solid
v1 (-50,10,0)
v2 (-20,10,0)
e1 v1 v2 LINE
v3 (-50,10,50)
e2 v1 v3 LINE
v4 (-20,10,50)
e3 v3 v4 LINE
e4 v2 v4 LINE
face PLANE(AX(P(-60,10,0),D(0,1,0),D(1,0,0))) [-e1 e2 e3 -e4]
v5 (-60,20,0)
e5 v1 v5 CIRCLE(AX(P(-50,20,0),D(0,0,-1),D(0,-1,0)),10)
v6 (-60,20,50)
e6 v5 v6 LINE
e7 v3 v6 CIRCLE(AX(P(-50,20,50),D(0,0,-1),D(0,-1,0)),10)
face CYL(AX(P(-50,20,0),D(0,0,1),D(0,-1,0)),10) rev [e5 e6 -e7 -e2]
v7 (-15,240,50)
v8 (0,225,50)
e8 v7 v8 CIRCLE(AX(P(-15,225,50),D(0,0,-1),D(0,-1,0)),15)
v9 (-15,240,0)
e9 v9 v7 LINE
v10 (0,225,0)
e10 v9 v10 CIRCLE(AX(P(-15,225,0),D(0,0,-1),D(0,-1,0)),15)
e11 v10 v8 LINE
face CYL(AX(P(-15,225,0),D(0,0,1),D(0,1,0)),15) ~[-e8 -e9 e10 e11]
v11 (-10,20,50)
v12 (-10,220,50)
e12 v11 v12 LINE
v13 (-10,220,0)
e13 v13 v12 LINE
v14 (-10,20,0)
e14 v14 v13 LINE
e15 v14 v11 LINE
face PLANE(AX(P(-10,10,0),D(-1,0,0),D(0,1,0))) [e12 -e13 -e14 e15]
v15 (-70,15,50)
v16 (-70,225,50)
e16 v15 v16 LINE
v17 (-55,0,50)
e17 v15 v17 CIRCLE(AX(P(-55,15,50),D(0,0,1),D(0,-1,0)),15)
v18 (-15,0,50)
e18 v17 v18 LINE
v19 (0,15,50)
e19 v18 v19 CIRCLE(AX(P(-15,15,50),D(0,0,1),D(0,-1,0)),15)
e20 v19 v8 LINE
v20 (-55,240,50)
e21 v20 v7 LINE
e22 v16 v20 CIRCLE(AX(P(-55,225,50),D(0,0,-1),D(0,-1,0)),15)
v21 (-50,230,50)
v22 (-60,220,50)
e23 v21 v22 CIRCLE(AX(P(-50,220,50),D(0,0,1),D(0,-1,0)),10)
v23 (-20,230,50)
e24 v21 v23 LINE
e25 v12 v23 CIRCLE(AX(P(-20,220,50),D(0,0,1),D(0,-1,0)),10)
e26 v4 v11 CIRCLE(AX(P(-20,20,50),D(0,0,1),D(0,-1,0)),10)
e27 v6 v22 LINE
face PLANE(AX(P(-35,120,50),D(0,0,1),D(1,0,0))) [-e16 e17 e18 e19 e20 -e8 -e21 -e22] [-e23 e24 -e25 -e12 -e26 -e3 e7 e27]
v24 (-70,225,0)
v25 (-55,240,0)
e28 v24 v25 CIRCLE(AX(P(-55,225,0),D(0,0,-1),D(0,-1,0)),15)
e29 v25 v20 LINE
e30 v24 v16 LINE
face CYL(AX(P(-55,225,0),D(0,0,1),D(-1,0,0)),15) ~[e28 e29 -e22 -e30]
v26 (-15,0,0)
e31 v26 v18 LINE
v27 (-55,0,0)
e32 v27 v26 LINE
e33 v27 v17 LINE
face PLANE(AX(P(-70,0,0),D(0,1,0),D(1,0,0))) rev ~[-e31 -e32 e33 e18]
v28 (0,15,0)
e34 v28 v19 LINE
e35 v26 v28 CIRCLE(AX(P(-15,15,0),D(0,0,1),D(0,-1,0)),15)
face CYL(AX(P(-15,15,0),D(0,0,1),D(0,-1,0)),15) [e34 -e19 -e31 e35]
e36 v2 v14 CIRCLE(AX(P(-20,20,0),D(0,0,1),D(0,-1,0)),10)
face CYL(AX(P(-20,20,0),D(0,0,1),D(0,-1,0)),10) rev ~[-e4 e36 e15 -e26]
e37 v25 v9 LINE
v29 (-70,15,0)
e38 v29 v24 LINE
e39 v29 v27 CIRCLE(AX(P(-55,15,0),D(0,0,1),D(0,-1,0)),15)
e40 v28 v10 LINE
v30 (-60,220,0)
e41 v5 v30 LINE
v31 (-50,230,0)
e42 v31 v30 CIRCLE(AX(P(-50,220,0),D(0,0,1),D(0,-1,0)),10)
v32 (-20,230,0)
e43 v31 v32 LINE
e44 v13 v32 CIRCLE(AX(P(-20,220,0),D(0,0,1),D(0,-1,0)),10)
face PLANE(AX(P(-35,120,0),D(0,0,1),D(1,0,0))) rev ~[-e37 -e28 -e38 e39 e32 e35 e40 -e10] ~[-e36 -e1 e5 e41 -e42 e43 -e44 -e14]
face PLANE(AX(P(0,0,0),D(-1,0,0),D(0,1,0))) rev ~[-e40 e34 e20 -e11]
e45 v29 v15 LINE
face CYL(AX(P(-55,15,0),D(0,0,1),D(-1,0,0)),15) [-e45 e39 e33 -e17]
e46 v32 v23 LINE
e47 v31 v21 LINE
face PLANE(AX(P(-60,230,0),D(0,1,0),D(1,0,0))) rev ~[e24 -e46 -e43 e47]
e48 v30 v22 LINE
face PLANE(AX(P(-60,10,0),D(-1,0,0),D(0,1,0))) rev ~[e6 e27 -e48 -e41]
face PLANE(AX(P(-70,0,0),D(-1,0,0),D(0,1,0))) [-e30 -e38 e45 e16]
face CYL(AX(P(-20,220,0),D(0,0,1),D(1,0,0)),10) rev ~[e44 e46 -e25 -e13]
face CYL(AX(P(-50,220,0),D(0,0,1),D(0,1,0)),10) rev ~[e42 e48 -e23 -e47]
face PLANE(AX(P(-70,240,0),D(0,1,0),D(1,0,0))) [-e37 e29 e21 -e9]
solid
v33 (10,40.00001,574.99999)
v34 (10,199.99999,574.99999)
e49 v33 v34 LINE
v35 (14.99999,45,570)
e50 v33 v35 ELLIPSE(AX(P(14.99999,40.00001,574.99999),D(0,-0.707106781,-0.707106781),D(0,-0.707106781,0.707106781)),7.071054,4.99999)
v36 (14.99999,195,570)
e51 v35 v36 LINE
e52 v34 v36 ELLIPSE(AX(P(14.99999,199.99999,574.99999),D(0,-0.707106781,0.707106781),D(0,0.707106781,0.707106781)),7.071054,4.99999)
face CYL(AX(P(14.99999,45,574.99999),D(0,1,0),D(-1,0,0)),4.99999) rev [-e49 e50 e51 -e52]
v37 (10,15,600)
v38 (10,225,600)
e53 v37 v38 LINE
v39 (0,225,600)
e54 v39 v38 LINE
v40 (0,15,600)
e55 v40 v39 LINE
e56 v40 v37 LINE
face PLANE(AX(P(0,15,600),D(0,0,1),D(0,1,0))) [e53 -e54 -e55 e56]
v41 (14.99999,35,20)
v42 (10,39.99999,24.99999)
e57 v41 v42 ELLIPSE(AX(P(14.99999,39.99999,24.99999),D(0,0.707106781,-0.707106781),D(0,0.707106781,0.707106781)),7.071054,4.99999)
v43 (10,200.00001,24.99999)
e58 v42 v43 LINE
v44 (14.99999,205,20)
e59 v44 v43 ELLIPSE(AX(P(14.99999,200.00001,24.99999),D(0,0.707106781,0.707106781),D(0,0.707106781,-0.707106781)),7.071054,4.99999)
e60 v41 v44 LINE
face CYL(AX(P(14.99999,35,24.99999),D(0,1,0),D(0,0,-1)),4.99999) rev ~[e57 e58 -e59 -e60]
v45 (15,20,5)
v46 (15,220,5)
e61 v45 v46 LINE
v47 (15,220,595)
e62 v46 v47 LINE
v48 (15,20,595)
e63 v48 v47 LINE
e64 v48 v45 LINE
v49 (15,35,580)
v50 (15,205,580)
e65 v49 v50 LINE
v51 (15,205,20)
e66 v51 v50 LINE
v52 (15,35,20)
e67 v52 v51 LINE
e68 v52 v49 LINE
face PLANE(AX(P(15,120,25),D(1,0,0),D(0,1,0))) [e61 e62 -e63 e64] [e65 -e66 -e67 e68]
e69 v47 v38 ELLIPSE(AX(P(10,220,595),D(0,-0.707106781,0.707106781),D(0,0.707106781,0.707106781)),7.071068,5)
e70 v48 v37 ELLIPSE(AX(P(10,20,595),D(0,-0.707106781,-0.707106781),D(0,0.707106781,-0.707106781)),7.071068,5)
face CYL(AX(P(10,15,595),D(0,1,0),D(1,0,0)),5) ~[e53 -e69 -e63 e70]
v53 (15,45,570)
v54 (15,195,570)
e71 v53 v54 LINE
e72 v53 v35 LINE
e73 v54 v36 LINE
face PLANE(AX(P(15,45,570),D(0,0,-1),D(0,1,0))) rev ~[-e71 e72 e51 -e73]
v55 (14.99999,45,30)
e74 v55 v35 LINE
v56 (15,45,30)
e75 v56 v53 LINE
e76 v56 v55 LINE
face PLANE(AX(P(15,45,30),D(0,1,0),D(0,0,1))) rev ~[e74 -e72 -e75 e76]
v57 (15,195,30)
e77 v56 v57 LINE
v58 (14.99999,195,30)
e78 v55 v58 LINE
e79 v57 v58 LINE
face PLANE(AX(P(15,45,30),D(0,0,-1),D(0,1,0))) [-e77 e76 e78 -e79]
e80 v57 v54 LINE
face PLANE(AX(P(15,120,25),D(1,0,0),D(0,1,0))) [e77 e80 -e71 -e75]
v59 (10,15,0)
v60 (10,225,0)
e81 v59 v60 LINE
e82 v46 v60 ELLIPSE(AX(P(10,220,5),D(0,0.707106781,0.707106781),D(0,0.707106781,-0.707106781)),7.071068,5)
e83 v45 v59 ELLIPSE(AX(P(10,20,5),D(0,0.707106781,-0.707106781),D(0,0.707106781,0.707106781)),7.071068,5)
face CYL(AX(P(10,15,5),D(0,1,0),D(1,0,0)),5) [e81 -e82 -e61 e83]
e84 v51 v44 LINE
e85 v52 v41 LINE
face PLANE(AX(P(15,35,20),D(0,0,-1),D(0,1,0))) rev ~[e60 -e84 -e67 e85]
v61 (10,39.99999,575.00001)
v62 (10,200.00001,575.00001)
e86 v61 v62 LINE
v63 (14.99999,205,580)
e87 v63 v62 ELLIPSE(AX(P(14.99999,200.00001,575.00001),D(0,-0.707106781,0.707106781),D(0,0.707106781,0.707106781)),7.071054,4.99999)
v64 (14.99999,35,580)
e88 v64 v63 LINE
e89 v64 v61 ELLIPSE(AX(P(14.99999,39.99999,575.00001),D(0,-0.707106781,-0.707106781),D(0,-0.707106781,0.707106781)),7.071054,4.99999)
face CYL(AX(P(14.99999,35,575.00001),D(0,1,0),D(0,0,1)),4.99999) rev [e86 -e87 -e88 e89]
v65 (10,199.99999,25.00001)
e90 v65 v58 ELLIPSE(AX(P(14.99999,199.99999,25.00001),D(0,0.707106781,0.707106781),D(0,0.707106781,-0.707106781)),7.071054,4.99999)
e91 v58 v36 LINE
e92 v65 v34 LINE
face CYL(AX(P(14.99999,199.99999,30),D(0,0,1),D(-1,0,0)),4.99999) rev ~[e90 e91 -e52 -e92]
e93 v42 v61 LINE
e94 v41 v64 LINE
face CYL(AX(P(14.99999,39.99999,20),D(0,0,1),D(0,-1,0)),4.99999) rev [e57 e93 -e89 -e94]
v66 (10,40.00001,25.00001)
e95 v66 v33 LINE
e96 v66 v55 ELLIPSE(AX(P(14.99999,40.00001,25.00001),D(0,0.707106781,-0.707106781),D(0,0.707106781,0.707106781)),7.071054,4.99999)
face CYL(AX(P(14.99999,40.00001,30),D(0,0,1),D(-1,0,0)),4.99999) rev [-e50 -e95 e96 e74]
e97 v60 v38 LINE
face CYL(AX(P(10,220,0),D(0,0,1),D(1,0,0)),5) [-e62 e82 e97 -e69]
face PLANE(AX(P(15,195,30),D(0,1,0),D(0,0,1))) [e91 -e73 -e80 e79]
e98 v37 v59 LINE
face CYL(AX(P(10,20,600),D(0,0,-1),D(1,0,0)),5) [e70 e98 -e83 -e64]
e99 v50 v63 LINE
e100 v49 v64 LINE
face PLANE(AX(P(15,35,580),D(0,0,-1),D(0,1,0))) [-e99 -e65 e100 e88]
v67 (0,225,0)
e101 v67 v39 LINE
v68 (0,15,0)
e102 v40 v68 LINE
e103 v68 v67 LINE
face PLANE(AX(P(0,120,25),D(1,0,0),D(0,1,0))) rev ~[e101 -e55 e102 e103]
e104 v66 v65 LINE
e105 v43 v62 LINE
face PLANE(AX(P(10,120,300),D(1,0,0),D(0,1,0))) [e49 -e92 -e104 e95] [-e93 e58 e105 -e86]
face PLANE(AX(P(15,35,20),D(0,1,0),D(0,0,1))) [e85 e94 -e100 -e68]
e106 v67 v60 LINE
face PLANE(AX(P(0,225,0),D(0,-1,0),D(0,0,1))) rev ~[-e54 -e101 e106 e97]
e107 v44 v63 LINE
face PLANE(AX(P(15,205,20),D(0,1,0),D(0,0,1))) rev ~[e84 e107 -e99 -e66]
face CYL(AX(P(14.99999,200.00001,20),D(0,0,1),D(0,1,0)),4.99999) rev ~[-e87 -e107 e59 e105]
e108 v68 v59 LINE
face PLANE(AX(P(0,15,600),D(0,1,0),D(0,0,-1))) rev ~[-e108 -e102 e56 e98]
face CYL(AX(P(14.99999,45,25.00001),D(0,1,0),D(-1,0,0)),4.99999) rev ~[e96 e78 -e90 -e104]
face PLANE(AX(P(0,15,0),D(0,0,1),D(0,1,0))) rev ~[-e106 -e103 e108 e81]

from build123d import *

# Parameters (mm, degrees)
F0_W     = 70
F0_H     = 240
F0_W_2   = 50
F0_H_2   = 220
F1_DEPTH = 50
F2_R     = 15
F3_R     = 10
F4_W     = 210
F4_H     = 50
F4_H_2   = 550
F5_DEPTH = 15
F6_W     = 170
F6_H     = 560
F6_W_2   = 150
F6_H_2   = 540
F7_DEPTH = 5
F8_R     = 4.99999
F9_R     = 5


# Not quite as in the source:
# - a fillet or chamfer is up to 0.001 mm smaller than in the source, because OpenCascade refuses the exact size


with BuildPart() as f1:
    # F0 (on Top) → F1 (new body)
    with BuildSketch(Plane.XY):
        with Locations((-35, 120)):
            Rectangle(F0_W, F0_H)
        with Locations((-35, 120)):
            Rectangle(F0_W_2, F0_H_2, mode=Mode.SUBTRACT)
    extrude(amount=F1_DEPTH)

    # F2
    f2_edges = [f1.edges().sort_by_distance(p)[0] for p in [
        (-70, 0, 25),
        (0, 0, 25),
        (-70, 240, 25),
        (0, 240, 25),
    ]]
    fillet(f2_edges, radius=F2_R)

    # F3
    f3_edges = [f1.edges().sort_by_distance(p)[0] for p in [
        (-10, 10, 25),
        (-60, 10, 25),
        (-10, 230, 25),
        (-60, 230, 25),
    ]]
    fillet(f3_edges, radius=F3_R)


with BuildPart() as f5:
    # F4 (on face) → F5 (new body)
    with BuildSketch(Plane.YZ):
        with Locations((120, 25)):
            Rectangle(F4_W, F4_H)
        with Locations((120, 325)):
            Rectangle(F4_W, F4_H_2)
    extrude(amount=F5_DEPTH)

    # F6 (on face) → F7 (cut)
    with BuildSketch(Plane.YZ.offset(15)):
        with Locations((120, 300)):
            Rectangle(F6_W, F6_H)
        with Locations((120, 300)):
            Rectangle(F6_W_2, F6_H_2, mode=Mode.SUBTRACT)
    extrude(amount=-F7_DEPTH, mode=Mode.SUBTRACT)

    # F8 (radius 5 in the source; OpenCascade refuses exactly that, so slightly less here)
    f8_edges = [f5.edges().sort_by_distance(p)[0] for p in [
        (10, 120, 20),
        (10, 120, 30),
        (10, 35, 300),
        (10, 120, 580),
        (10, 195, 300),
        (10, 45, 300),
        (10, 120, 570),
        (10, 205, 300),
    ]]
    fillet(f8_edges, radius=F8_R)

    # F9
    f9_edges = [f5.edges().sort_by_distance(p)[0] for p in [
        (15, 120, 0),
        (15, 225, 300),
        (15, 15, 300),
        (15, 120, 600),
    ]]
    fillet(f9_edges, radius=F9_R)


solid = Compound([f1.part, f5.part])
